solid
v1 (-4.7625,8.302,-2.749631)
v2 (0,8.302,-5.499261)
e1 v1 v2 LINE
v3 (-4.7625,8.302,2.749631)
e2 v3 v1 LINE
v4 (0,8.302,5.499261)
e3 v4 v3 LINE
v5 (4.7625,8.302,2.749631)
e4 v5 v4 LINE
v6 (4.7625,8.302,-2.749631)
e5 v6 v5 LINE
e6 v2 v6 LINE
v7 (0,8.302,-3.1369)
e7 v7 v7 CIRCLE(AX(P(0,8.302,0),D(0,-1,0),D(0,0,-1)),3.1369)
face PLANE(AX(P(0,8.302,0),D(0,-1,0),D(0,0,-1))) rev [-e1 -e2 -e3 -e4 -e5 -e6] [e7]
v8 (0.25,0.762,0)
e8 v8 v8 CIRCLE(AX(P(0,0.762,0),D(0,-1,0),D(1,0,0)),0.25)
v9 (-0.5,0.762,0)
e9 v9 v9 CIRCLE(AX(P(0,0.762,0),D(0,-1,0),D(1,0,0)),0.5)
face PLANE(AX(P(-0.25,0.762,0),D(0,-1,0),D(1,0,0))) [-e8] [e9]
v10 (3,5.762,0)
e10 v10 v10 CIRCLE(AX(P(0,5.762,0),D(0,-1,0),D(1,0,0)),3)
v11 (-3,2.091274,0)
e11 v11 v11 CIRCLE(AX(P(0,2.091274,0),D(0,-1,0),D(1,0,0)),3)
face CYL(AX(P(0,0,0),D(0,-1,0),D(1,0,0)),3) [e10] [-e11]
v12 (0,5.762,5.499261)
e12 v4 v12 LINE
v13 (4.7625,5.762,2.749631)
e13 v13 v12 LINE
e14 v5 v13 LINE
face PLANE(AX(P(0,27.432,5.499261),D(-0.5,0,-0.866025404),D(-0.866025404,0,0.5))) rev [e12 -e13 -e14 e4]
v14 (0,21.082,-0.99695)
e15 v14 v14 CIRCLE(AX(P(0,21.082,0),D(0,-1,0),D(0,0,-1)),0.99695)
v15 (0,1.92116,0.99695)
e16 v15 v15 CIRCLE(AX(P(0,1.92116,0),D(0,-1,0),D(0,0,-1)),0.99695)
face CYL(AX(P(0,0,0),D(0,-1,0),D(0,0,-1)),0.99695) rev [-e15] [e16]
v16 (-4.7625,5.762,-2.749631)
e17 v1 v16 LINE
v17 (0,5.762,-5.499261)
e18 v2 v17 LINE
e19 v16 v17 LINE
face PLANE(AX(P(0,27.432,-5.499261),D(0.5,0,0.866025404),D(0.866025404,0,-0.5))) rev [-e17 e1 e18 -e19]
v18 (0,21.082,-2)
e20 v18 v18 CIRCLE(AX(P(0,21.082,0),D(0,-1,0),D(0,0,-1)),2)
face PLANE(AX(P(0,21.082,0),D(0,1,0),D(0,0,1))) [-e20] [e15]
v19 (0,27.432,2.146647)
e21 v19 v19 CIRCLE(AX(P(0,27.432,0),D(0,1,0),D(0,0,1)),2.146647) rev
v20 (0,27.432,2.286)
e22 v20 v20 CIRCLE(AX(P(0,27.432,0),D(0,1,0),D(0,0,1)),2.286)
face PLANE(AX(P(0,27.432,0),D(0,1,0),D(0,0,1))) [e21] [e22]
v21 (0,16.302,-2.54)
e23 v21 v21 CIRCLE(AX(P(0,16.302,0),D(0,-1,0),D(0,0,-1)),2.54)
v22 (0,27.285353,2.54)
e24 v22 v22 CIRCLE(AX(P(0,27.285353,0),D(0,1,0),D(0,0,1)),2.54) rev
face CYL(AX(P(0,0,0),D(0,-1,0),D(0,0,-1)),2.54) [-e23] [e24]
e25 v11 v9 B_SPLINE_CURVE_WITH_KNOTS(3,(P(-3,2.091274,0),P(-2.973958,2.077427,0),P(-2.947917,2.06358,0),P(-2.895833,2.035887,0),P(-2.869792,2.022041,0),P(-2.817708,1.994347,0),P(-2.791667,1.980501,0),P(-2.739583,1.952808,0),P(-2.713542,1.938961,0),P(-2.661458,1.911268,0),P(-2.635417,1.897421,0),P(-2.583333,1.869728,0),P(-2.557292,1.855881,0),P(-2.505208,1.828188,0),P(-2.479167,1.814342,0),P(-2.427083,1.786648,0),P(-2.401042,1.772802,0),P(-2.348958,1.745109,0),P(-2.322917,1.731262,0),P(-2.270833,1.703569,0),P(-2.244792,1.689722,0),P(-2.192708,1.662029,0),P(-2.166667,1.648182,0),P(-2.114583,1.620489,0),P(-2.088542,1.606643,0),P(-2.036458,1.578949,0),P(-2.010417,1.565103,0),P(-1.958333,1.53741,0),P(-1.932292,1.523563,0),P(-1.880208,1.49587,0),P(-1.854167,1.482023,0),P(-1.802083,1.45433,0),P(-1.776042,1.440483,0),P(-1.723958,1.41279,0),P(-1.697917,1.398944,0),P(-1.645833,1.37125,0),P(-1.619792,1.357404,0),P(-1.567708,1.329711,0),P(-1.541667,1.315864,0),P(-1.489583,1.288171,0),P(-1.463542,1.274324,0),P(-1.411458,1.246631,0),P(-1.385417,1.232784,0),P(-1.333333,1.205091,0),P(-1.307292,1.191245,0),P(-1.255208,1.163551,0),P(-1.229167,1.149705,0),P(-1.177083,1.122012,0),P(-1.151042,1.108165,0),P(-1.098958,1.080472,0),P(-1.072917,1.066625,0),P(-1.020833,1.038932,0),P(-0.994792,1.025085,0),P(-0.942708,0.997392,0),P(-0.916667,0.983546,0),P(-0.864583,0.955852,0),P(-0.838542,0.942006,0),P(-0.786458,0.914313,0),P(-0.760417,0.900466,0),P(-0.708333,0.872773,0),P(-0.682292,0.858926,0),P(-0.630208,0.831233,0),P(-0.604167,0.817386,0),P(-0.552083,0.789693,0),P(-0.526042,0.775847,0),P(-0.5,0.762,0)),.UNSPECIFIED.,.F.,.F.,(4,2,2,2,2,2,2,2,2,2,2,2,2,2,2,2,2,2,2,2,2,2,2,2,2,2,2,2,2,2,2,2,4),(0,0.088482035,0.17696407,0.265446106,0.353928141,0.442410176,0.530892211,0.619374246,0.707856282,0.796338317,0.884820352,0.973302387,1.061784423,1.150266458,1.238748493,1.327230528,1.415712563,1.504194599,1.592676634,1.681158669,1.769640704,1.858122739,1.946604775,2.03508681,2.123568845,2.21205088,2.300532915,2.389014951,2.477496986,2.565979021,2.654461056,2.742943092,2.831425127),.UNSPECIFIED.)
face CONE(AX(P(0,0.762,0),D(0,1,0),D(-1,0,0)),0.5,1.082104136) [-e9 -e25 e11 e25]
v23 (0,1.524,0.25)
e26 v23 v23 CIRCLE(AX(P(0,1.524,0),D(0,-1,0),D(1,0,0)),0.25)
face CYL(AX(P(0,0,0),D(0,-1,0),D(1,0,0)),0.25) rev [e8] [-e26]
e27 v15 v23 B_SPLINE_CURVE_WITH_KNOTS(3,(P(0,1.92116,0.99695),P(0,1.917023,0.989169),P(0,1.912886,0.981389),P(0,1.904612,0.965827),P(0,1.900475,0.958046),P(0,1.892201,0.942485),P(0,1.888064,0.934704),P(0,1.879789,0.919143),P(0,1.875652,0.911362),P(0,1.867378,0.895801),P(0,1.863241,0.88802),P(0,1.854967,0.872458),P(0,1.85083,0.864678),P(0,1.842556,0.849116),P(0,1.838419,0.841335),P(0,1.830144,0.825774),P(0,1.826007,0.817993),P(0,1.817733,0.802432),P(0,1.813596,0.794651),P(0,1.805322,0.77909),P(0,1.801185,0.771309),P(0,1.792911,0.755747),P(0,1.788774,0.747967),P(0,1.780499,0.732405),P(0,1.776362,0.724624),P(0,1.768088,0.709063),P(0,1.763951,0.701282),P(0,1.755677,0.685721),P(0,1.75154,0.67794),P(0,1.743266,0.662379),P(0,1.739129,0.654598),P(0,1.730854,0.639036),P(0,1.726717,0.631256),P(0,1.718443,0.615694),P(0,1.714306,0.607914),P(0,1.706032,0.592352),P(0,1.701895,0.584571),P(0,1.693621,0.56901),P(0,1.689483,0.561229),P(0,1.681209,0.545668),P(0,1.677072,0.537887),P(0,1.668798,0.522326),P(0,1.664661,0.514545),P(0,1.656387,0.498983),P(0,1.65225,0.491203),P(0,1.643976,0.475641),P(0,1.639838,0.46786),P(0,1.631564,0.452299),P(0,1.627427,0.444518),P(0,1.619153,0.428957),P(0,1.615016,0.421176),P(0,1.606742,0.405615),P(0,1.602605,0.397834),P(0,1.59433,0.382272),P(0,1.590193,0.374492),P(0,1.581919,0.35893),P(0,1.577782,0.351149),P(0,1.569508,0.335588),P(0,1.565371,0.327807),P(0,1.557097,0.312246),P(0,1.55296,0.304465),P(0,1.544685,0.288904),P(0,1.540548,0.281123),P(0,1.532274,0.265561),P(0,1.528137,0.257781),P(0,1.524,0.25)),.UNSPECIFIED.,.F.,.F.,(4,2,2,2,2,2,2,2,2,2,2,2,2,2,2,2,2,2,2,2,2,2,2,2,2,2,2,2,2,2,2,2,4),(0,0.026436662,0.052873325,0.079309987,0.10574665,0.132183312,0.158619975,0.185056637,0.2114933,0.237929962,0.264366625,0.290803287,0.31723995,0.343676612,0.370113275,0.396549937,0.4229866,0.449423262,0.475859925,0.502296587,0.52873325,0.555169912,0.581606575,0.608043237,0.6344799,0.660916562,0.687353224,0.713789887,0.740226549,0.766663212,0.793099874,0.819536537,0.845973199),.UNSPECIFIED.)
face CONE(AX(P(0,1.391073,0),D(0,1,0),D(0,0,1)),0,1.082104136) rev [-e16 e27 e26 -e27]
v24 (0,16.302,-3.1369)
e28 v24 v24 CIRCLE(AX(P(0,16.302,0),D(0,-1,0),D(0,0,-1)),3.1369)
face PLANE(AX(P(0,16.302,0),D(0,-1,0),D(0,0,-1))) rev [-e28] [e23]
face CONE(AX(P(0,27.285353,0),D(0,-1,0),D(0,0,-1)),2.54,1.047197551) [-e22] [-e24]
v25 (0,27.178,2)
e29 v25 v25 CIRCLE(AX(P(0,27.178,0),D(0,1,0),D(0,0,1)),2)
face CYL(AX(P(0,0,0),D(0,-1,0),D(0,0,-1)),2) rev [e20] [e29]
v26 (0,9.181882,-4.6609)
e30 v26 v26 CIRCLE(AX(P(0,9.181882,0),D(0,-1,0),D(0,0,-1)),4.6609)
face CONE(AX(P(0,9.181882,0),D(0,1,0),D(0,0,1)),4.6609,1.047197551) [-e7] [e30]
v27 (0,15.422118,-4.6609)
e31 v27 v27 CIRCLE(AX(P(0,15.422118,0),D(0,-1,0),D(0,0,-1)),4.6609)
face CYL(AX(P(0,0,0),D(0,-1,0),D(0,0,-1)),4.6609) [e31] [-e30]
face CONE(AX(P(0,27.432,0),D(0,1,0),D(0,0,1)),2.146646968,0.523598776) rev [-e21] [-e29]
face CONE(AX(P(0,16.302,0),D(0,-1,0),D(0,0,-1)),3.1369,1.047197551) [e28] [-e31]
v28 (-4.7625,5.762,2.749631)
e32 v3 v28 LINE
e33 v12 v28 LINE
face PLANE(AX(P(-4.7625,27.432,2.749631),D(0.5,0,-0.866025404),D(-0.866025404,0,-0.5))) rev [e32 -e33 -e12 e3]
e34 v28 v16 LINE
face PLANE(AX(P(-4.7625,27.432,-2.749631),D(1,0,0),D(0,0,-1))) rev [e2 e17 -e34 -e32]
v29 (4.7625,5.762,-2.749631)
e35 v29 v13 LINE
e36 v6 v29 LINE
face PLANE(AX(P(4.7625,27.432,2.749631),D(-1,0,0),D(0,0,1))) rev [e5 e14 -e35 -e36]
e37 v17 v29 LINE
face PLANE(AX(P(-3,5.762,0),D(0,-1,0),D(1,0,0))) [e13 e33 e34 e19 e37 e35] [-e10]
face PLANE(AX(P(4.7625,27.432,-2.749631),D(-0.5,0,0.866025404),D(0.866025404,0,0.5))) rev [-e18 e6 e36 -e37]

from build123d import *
from OCP.BRepFilletAPI import BRepFilletAPI_MakeChamfer

# Parameters (mm, degrees)
BOSS_EXTRUDE1_DEPTH = 27.432
CHAMFER1_SIZE       = 0.254
CHAMFER1_SIZE2      = 0.146646968


# Read off the part's stored shape, not the designer's step: Cut-Revolve4
with BuildPart() as part:
    # Sketch3 → Boss-Extrude1 (new body)
    with BuildSketch(Plane(origin=(0, 0, 0), x_dir=(1, 0, 0), z_dir=(0, 1, 0))):
        Polygon((4.7625, 2.749630657), (0, 5.499261314), (-4.7625, 2.749630657), (-4.7625, -2.749630657), (0, -5.499261314), (4.7625, -2.749630657), align=None)
    extrude(amount=BOSS_EXTRUDE1_DEPTH)

    # Cut-Revolve4 outline → Cut-Revolve4 (revolve, cut)
    with BuildSketch(Plane.XY):
        Polygon((4.6609, 9.18188181), (3.1369, 8.302), (5.499261314, 8.302), (5.499261314, 27.432), (2.54, 27.432), (2.54, 16.302), (3.1369, 16.302), (4.6609, 15.42211819), align=None)
        Polygon((0.99695, 21.082), (2, 21.082), (2, 27.432), (0, 27.432), (0, 1.391072642), (0.99695, 1.92116036), align=None)
    revolve(axis=Axis((0, 0, 0), (0, 1, 0)), mode=Mode.SUBTRACT)

    # Chamfer1: one chamfer whose edges measure the first distance from different faces: ONE call of the kernel's chamfer builder (chamfer() names one face for all edges)
    chamfer1_edges_1 = [part.edges().sort_by_distance(p)[0] for p in [
        (-2.54, 27.432, 0),
    ]]
    chamfer1_side_1 = [part.faces().sort_by_distance(p)[0] for p in [
        (-2.468157951, 27.432, 0),
    ]]
    chamfer1_edges_2 = [part.edges().sort_by_distance(p)[0] for p in [
        (-2, 27.432, 0),
    ]]
    chamfer1_side_2 = [part.faces().sort_by_distance(p)[0] for p in [
        (-2, 24.257, 0),
    ]]
    chamfer1 = BRepFilletAPI_MakeChamfer(part.part.solid().wrapped)
    for e in chamfer1_edges_1:
        chamfer1.Add(CHAMFER1_SIZE, CHAMFER1_SIZE2, e.wrapped, chamfer1_side_1[0].wrapped)  # the first distance lies on this face
    for e in chamfer1_edges_2:
        chamfer1.Add(CHAMFER1_SIZE, CHAMFER1_SIZE2, e.wrapped, chamfer1_side_2[0].wrapped)  # the first distance lies on this face
    add(Compound.cast(chamfer1.Shape()), mode=Mode.REPLACE)

    # Sketch4 → Cut-Revolve5 (revolve, cut)
    with BuildSketch(Plane.XY, mode=Mode.PRIVATE) as cut_revolve5_sk:
        Polygon((-0.25, 0.762), (-0.5, 0.762), (-3, 2.091273579), (-3, 5.762), (-6.107414125, 5.762), (-6.107414125, 0), (0, 0), (0, 1.524), (-0.25, 1.524), align=None)
    revolve(cut_revolve5_sk.sketch.rotate(Axis((0, 0, 0), (0, 1, 0)), 270), axis=Axis((0, 0, 0), (0, 1, 0)), mode=Mode.SUBTRACT)


solid = part.part
